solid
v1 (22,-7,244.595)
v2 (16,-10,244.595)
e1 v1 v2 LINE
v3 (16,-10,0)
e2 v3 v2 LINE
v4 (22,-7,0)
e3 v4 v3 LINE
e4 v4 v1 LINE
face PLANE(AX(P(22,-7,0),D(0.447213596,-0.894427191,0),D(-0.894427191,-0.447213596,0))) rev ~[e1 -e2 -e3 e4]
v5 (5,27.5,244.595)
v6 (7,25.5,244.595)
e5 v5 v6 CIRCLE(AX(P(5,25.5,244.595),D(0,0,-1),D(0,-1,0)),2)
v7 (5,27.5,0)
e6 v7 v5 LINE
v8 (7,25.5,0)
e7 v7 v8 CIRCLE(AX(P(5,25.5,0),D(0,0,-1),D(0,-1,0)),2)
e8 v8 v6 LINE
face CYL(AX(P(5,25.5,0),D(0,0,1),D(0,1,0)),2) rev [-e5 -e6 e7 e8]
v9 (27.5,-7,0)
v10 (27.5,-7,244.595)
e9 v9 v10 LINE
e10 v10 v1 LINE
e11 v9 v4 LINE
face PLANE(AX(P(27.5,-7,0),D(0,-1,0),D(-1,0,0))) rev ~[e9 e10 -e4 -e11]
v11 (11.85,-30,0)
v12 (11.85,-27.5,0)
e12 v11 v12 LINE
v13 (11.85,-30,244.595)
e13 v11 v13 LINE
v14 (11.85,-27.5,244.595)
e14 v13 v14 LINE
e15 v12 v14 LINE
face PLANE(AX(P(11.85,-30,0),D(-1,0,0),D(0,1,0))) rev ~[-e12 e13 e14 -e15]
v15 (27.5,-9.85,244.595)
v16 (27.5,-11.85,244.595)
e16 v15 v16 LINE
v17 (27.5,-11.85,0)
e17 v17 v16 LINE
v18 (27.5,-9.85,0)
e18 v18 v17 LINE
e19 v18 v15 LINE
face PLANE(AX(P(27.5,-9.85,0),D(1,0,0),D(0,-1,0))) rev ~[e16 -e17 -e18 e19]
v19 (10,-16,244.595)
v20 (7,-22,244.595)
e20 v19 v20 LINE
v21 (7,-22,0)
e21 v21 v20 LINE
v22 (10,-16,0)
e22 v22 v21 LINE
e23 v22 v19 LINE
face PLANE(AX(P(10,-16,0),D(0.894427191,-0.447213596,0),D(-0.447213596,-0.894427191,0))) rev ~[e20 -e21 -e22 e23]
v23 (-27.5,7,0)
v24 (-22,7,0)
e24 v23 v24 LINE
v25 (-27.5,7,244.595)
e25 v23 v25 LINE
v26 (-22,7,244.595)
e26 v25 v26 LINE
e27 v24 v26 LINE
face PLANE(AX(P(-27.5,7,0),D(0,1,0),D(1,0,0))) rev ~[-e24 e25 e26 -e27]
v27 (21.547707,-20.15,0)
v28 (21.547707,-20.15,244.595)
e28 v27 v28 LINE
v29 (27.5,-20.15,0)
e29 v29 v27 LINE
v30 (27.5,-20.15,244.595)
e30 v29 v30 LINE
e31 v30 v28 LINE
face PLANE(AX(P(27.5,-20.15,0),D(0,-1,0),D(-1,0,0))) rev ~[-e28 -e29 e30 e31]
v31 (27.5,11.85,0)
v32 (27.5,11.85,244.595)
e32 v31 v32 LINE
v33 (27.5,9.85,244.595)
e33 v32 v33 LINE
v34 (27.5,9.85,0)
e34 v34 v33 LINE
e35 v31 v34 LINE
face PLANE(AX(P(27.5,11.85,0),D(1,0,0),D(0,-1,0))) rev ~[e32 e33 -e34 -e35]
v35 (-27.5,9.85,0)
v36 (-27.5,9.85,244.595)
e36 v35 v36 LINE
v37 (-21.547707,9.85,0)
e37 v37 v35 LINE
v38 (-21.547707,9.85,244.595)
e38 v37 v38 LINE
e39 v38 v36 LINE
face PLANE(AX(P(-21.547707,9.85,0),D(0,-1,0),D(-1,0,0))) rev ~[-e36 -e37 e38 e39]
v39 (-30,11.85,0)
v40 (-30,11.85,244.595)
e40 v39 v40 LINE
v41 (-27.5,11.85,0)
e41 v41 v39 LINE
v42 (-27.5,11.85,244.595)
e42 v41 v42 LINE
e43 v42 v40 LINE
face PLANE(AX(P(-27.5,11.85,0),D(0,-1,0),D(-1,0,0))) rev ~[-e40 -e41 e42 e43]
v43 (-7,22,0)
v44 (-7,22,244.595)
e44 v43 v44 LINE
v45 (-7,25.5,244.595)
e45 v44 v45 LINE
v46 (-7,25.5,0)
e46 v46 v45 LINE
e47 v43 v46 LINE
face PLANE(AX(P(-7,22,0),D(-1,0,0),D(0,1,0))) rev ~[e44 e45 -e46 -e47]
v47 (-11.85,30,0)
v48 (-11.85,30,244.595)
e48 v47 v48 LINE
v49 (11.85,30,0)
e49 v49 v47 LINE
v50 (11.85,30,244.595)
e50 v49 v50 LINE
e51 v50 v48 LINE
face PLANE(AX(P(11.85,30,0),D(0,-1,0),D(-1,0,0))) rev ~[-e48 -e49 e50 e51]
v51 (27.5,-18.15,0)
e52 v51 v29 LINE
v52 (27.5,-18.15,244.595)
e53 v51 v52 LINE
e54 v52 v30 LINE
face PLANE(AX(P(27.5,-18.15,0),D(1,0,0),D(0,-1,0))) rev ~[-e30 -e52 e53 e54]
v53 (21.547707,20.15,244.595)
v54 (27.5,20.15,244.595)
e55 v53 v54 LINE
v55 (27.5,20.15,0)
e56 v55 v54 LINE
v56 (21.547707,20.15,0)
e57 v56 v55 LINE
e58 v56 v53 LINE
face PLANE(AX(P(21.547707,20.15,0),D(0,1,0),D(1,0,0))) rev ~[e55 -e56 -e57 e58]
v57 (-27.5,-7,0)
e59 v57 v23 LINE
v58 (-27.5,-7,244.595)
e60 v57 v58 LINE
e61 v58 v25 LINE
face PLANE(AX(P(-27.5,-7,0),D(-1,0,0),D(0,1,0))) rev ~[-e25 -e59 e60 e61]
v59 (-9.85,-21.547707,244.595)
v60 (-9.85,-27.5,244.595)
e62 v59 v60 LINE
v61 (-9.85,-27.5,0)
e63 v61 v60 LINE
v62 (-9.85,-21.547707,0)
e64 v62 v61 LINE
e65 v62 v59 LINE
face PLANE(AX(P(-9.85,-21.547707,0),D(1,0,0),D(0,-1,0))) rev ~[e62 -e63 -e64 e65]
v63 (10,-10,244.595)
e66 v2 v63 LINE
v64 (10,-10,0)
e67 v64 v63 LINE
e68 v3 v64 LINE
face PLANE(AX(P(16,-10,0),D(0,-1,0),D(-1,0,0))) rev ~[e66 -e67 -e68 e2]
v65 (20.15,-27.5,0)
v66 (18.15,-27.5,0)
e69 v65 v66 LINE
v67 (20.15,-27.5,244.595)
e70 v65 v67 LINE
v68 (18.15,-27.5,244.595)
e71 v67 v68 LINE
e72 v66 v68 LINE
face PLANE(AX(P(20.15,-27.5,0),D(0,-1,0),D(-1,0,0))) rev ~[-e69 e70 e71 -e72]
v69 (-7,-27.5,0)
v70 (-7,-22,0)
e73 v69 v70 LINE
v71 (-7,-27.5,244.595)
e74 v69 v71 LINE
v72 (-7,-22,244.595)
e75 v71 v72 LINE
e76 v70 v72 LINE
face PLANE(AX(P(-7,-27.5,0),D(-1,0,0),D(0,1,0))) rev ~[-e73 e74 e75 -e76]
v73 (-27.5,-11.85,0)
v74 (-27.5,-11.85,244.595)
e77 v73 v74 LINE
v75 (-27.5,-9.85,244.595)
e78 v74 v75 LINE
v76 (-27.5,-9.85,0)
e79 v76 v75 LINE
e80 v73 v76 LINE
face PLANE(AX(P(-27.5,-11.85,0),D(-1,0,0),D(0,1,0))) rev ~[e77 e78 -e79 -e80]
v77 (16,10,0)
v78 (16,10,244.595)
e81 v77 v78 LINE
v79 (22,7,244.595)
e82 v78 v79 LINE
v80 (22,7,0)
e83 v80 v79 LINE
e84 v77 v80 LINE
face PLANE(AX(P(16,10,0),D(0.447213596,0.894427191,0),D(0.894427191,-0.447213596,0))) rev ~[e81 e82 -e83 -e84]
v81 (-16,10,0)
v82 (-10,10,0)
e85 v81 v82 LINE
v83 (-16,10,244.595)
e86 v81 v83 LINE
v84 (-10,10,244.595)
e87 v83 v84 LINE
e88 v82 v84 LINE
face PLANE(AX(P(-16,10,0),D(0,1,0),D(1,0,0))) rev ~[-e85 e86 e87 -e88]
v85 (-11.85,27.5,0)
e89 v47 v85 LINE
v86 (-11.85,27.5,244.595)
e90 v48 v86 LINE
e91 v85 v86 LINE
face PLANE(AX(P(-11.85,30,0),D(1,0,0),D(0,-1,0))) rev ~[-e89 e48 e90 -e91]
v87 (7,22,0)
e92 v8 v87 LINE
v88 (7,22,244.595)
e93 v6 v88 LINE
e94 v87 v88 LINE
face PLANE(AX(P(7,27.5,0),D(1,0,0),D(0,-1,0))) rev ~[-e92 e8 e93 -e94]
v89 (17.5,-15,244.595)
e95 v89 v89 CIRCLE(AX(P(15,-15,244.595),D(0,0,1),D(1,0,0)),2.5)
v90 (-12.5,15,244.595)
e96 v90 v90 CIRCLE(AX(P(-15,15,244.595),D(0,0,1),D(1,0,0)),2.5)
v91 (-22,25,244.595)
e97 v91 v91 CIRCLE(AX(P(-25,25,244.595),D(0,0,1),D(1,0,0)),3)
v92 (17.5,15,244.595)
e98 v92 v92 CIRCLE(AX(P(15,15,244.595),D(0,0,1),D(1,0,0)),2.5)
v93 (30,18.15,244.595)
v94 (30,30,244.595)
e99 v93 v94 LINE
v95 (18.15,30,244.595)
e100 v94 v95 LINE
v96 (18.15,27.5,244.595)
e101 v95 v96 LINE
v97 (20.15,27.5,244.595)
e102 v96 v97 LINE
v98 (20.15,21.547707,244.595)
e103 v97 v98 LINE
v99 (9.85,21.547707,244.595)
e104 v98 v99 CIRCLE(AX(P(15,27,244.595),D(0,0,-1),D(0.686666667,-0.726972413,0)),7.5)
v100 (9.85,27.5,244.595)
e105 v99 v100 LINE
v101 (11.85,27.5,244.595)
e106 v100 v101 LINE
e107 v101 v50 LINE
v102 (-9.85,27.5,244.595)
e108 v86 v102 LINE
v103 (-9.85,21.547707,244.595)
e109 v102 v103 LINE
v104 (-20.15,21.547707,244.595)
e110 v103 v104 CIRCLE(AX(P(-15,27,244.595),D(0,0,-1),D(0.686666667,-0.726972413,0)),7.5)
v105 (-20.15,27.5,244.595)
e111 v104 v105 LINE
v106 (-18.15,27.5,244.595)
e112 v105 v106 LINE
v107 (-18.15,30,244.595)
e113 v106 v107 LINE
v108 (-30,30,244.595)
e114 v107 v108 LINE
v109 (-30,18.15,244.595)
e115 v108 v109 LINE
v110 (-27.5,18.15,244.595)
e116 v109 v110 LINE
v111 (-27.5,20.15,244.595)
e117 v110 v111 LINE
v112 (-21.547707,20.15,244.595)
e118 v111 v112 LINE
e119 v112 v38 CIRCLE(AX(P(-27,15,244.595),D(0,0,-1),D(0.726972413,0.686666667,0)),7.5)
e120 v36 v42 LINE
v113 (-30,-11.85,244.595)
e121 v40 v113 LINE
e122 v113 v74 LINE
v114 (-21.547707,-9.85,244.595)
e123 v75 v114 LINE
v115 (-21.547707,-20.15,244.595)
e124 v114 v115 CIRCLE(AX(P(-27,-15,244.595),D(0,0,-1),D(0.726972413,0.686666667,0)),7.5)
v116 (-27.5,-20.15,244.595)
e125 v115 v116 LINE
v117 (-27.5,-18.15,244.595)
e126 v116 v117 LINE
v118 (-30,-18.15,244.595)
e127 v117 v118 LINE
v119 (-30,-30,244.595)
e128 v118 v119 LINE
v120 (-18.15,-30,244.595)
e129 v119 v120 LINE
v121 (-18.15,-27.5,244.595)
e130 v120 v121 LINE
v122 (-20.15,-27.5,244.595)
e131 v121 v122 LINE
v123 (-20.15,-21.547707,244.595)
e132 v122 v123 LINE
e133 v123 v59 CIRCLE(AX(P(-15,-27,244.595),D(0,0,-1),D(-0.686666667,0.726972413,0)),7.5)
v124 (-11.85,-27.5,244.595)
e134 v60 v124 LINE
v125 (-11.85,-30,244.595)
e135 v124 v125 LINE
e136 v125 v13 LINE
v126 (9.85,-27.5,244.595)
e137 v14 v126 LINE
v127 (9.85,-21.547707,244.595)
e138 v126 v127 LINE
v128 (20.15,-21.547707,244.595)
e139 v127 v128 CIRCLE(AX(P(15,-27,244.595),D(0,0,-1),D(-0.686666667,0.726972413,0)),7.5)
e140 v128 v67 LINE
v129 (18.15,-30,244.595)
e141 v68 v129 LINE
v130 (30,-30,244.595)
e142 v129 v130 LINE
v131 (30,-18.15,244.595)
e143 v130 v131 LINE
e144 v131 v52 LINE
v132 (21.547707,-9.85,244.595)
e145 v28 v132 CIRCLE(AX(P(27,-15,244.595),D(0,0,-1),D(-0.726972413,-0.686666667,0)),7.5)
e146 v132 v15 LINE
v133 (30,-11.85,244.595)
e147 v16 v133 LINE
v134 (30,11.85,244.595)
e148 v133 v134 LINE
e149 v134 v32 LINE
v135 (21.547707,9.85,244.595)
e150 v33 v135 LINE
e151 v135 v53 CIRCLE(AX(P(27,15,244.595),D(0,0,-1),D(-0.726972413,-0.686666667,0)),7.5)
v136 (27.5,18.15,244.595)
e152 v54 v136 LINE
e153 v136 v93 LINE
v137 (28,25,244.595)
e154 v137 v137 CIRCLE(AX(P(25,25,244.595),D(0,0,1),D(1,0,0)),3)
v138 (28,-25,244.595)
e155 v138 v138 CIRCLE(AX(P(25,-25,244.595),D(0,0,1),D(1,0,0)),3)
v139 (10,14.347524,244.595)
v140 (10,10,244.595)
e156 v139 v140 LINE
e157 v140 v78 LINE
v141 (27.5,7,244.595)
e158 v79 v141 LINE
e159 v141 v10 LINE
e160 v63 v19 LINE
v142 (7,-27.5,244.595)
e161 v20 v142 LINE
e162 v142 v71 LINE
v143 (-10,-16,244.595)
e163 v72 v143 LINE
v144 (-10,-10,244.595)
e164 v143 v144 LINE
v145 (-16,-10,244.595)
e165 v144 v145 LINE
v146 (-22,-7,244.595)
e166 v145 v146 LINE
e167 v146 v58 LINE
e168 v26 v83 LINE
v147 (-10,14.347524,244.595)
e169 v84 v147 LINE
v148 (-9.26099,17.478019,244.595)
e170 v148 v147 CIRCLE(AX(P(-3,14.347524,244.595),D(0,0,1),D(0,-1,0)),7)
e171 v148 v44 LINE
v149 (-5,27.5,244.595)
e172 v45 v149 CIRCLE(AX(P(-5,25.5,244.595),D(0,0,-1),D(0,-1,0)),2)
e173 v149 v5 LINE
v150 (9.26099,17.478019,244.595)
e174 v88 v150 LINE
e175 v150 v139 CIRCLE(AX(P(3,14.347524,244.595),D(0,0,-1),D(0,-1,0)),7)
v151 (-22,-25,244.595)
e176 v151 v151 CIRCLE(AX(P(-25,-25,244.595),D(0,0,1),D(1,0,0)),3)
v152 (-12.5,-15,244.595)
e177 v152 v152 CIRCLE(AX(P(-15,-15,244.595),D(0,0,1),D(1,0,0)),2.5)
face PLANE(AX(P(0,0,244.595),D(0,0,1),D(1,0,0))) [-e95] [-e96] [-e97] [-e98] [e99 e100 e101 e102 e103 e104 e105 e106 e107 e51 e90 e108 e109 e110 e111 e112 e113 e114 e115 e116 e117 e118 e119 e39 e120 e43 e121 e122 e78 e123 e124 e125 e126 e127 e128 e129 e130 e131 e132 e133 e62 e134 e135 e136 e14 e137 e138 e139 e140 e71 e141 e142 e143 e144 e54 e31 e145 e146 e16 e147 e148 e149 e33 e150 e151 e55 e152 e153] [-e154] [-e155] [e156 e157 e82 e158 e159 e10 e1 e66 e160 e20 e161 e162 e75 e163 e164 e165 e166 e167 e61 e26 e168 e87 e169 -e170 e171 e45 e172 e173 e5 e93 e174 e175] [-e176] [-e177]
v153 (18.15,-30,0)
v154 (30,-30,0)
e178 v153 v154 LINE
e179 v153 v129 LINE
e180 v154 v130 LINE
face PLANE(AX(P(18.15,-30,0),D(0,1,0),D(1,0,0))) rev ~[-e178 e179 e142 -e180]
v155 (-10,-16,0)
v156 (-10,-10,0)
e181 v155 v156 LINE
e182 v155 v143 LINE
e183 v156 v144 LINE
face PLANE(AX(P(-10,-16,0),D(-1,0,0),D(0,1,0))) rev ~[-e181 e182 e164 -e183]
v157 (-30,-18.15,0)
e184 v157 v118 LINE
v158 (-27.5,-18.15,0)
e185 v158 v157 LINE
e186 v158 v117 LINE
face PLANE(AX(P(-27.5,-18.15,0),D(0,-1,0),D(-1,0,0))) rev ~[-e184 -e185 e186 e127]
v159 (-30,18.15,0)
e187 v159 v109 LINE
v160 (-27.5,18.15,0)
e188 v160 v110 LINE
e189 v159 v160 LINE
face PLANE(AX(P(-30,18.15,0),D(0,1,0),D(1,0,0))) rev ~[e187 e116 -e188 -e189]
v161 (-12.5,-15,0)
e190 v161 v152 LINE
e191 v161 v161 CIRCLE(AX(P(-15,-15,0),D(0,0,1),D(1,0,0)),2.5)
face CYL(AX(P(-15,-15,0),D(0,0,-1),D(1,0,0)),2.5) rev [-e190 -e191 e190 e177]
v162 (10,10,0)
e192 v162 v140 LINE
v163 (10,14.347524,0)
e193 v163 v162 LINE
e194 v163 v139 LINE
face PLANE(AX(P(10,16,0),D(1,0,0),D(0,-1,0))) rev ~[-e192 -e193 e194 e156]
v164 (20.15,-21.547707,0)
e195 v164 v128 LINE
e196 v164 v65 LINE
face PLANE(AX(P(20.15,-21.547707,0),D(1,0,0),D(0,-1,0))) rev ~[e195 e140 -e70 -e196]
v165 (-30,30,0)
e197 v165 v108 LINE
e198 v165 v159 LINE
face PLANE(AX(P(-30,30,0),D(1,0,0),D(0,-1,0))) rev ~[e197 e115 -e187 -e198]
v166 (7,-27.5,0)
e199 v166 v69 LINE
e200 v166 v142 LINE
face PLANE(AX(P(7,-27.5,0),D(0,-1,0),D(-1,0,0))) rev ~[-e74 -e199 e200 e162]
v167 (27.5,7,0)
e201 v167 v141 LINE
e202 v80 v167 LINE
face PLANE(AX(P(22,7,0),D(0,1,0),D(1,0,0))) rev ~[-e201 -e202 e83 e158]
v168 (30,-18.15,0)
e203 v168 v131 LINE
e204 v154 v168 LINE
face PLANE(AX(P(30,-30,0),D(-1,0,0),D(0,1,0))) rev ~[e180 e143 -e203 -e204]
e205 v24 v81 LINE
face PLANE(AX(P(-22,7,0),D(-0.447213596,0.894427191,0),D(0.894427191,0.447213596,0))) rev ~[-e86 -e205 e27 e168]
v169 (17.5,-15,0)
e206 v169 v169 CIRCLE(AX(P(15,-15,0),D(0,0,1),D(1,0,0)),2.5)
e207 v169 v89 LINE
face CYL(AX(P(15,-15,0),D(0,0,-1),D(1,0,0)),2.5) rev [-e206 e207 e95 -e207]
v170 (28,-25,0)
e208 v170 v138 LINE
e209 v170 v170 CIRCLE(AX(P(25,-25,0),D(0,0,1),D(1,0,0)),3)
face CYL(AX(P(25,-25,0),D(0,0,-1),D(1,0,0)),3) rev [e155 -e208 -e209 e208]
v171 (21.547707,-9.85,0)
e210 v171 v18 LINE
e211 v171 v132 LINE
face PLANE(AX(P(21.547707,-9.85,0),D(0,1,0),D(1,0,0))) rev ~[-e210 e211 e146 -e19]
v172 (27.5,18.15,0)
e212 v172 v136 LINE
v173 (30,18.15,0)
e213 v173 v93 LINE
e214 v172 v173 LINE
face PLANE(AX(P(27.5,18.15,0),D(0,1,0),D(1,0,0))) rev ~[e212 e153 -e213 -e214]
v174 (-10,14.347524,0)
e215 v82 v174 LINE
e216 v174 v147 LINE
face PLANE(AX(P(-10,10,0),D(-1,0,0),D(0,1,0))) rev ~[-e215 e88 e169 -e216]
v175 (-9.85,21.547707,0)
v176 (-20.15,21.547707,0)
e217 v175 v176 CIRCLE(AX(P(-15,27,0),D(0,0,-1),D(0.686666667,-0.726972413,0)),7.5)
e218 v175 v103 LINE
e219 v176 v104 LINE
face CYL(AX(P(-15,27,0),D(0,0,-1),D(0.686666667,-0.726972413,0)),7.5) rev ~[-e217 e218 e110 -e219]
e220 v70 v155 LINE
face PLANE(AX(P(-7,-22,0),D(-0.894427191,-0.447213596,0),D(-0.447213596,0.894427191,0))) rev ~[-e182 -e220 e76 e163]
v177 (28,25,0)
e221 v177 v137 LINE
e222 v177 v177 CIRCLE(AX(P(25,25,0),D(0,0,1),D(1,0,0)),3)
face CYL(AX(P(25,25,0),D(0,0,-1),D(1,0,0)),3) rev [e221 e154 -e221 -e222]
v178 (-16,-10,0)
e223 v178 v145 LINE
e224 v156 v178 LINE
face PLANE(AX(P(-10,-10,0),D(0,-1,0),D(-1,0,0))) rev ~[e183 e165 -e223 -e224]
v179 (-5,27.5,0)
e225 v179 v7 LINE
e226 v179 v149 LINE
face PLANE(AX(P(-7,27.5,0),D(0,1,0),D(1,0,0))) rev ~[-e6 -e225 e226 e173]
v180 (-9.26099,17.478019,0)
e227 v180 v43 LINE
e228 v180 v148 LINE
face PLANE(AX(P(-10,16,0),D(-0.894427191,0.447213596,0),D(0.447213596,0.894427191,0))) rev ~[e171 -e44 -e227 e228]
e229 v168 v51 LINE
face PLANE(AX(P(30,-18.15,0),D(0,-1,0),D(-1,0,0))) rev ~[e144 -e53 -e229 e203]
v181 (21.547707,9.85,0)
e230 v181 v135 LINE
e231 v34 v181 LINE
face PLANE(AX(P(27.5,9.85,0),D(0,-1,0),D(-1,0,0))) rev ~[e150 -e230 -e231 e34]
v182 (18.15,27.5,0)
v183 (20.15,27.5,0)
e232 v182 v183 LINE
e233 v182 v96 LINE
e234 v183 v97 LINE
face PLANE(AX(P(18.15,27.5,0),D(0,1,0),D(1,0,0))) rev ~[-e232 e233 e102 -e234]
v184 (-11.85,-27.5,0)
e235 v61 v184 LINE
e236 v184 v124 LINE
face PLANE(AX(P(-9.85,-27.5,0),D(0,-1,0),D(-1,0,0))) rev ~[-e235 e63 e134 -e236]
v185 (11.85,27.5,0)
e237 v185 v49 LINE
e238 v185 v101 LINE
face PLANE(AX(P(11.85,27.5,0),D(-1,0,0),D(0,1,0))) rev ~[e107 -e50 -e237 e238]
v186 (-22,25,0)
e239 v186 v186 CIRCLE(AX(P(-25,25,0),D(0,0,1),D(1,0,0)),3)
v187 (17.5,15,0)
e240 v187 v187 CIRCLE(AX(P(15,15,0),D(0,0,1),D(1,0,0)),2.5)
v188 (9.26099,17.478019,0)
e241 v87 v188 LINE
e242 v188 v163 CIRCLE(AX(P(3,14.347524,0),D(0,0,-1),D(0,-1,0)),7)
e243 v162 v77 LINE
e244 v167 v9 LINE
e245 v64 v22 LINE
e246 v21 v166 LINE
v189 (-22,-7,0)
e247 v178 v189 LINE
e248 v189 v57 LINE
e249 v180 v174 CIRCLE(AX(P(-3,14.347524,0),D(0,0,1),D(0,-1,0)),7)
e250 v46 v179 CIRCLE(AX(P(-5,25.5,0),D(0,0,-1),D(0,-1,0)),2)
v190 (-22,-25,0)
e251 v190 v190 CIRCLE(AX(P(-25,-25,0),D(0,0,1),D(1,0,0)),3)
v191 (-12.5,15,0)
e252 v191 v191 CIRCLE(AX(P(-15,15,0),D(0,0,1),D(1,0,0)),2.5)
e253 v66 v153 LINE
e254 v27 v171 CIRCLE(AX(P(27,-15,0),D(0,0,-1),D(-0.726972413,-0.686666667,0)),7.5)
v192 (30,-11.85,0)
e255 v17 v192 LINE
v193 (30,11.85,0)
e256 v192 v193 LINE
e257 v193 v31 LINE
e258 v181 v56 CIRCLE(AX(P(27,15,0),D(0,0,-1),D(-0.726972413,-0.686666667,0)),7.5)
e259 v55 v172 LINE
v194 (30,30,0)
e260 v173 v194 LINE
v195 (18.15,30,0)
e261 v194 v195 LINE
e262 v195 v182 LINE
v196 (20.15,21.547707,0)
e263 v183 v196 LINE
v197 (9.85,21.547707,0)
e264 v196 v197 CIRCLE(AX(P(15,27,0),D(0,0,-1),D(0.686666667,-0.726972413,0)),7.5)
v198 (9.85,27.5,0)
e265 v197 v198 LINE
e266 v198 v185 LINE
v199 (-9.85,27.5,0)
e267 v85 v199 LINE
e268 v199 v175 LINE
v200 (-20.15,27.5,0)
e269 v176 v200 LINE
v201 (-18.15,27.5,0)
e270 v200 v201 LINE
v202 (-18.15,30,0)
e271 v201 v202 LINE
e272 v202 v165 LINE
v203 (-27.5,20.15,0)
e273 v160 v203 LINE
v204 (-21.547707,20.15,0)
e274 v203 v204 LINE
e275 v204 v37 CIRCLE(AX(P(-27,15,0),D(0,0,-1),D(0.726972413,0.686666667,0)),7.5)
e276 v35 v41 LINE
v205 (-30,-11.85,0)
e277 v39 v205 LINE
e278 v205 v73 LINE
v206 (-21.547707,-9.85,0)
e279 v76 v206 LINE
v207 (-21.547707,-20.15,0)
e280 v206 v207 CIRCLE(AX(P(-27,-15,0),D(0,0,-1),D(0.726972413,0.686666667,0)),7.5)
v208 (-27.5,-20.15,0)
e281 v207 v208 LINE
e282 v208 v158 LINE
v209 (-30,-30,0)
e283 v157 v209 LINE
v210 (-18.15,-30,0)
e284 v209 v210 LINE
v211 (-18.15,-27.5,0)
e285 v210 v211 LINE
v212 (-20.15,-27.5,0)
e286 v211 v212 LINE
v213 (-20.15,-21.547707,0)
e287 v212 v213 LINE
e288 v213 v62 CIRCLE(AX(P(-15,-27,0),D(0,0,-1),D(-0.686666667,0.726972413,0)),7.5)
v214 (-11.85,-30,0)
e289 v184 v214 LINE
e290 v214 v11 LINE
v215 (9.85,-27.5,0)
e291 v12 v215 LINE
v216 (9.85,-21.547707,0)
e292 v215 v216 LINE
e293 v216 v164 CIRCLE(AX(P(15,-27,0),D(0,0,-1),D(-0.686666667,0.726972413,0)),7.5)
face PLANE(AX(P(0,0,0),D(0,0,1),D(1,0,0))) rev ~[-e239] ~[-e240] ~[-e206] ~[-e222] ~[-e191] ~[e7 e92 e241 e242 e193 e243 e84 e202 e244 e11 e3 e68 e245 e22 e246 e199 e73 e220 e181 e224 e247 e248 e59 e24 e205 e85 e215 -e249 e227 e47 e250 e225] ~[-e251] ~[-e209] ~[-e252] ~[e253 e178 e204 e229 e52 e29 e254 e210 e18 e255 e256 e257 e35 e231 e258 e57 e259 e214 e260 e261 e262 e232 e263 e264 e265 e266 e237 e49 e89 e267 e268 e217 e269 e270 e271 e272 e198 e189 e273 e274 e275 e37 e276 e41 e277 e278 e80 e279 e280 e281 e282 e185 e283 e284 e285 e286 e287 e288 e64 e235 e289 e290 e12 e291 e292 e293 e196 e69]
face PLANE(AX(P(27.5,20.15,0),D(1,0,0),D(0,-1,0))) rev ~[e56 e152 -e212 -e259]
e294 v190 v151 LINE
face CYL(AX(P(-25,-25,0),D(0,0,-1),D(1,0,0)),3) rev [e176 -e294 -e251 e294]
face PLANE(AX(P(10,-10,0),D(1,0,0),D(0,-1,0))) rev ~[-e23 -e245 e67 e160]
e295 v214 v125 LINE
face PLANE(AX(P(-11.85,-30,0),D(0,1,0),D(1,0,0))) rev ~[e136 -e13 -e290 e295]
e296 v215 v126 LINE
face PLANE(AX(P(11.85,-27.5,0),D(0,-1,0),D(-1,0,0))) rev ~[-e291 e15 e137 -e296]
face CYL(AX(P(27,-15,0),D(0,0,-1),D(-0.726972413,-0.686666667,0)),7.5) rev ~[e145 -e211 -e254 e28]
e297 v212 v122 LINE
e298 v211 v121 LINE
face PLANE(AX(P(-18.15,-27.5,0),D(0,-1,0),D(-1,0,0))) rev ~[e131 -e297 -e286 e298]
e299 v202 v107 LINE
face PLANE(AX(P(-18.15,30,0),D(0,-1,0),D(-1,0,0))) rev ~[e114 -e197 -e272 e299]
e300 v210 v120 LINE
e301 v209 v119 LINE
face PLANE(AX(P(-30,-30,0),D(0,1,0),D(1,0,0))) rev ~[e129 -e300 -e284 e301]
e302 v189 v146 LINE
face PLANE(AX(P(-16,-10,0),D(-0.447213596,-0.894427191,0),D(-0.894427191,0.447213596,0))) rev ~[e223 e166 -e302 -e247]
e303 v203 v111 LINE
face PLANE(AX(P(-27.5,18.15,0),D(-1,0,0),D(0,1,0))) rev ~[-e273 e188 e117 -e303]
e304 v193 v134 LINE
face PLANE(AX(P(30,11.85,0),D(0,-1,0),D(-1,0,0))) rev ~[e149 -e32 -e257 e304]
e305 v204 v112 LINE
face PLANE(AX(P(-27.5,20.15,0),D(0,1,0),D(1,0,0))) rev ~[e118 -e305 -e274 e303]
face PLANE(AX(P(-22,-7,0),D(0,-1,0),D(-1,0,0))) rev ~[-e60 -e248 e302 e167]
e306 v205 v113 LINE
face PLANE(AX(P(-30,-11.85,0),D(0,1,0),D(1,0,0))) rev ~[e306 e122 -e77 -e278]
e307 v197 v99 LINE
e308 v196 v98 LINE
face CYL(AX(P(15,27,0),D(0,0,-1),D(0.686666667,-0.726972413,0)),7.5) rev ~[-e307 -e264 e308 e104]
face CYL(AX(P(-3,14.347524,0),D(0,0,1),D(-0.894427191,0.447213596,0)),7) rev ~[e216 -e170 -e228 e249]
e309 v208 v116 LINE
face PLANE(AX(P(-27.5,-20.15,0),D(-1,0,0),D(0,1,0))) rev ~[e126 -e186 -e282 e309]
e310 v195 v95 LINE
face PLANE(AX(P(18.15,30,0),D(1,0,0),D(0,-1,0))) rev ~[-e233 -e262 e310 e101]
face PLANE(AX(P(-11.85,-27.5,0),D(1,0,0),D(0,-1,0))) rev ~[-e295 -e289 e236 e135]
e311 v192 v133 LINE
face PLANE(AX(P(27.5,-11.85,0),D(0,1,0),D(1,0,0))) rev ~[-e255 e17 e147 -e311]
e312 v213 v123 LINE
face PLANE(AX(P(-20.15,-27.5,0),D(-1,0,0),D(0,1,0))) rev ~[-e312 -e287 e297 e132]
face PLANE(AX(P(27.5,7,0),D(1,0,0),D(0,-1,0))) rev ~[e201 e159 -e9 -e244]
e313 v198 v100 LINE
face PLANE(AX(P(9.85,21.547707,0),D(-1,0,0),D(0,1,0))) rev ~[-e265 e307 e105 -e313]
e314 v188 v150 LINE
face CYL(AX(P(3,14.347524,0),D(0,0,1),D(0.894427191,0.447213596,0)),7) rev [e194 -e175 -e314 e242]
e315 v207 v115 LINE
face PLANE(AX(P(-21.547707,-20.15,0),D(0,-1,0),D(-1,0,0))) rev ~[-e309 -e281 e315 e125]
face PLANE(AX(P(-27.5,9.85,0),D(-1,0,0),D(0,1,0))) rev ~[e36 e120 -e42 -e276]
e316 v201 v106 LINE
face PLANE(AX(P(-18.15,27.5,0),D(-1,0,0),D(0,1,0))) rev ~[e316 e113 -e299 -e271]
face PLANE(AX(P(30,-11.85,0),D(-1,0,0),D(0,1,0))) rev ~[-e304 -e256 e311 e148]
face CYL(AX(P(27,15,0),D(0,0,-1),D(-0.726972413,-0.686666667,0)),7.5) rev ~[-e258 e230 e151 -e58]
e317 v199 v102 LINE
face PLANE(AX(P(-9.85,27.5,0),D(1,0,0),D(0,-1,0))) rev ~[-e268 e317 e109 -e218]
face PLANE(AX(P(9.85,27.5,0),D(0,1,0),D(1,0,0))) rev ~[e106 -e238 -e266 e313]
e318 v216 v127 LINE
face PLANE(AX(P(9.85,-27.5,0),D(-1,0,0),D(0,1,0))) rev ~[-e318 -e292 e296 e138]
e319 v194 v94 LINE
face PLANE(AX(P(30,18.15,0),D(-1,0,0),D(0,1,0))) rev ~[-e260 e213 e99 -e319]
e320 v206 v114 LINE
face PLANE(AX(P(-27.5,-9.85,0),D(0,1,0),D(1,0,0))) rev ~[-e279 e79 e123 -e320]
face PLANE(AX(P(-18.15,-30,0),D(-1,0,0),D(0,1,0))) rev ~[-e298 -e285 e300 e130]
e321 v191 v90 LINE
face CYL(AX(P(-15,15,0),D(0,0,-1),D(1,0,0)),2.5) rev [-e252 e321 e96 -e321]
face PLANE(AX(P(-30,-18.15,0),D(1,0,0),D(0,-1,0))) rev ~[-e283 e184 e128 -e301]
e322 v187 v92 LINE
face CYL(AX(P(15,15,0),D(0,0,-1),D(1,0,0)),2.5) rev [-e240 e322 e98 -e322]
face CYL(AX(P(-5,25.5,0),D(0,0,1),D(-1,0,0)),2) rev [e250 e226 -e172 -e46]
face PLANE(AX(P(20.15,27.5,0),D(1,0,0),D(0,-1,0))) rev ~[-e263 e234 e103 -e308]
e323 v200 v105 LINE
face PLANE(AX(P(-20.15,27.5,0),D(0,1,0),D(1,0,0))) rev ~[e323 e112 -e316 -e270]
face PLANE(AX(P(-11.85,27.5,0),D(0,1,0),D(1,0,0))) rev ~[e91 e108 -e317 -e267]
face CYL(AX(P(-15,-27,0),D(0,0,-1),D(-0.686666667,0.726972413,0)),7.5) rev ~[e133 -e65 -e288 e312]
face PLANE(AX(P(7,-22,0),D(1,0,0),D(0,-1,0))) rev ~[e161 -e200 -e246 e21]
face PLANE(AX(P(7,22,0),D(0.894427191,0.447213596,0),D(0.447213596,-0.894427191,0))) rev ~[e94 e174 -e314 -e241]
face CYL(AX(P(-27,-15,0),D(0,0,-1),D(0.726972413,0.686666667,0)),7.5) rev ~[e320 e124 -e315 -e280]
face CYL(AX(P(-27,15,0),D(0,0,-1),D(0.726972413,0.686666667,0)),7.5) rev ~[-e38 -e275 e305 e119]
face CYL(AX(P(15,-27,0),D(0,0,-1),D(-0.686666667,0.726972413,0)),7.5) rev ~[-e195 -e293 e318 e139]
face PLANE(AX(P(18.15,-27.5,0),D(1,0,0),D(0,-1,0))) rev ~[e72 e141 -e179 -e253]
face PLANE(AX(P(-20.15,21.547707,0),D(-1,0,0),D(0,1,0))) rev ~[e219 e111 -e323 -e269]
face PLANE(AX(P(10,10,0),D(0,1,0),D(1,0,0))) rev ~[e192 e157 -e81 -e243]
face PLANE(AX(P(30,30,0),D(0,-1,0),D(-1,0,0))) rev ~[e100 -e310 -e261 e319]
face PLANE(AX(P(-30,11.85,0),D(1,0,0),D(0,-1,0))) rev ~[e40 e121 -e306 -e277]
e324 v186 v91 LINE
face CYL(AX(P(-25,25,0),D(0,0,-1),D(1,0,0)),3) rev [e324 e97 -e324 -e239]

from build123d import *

# Parameters (mm, degrees)
F0_R     = 3
F0_R_2   = 2.5
F1_DEPTH = 244.595
F2_R     = 2
F3_R     = 7


# Not quite as in the source:
# - a feature names something its author has since deleted; it is built from what else it names


with BuildPart() as f1:
    # F0 (on Top) → F1 (new body)
    with BuildSketch(Plane.XY):
        with BuildLine():
            Line((18.15, -30), (30, -30))
            Line((30, -30), (30, -18.15))
            Line((30, -18.15), (27.5, -18.15))
            Line((27.5, -18.15), (27.5, -20.15))
            Line((27.5, -20.15), (21.5477069044, -20.15))
            ThreePointArc((21.5477069044, -20.15), (19.5, -15), (21.5477069044, -9.85))
            Line((21.5477069044, -9.85), (27.5, -9.85))
            Line((27.5, -9.85), (27.5, -11.85))
            Line((27.5, -11.85), (30, -11.85))
            Line((30, -11.85), (30, 11.85))
            Line((30, 11.85), (27.5, 11.85))
            Line((27.5, 11.85), (27.5, 9.85))
            Line((27.5, 9.85), (21.5477069044, 9.85))
            ThreePointArc((21.5477069044, 9.85), (19.5, 15), (21.5477069044, 20.15))
            Line((21.5477069044, 20.15), (27.5, 20.15))
            Line((27.5, 20.15), (27.5, 18.15))
            Line((27.5, 18.15), (30, 18.15))
            Line((30, 18.15), (30, 30))
            Line((30, 30), (18.15, 30))
            Line((18.15, 30), (18.15, 27.5))
            Line((18.15, 27.5), (20.15, 27.5))
            Line((20.15, 27.5), (20.15, 21.5477069044))
            ThreePointArc((20.15, 21.5477069044), (15, 19.5), (9.85, 21.5477069044))
            Line((9.85, 21.5477069044), (9.85, 27.5))
            Line((9.85, 27.5), (11.85, 27.5))
            Line((11.85, 27.5), (11.85, 30))
            Line((11.85, 30), (-11.85, 30))
            Line((-11.85, 30), (-11.85, 27.5))
            Line((-11.85, 27.5), (-9.85, 27.5))
            Line((-9.85, 27.5), (-9.85, 21.5477069044))
            ThreePointArc((-9.85, 21.5477069044), (-15, 19.5), (-20.15, 21.5477069044))
            Line((-20.15, 21.5477069044), (-20.15, 27.5))
            Line((-20.15, 27.5), (-18.15, 27.5))
            Line((-18.15, 27.5), (-18.15, 30))
            Line((-18.15, 30), (-30, 30))
            Line((-30, 30), (-30, 18.15))
            Line((-30, 18.15), (-27.5, 18.15))
            Line((-27.5, 18.15), (-27.5, 20.15))
            Line((-27.5, 20.15), (-21.5477069044, 20.15))
            ThreePointArc((-21.5477069044, 20.15), (-19.5, 15), (-21.5477069044, 9.85))
            Line((-21.5477069044, 9.85), (-27.5, 9.85))
            Line((-27.5, 9.85), (-27.5, 11.85))
            Line((-27.5, 11.85), (-30, 11.85))
            Line((-30, 11.85), (-30, -11.85))
            Line((-30, -11.85), (-27.5, -11.85))
            Line((-27.5, -11.85), (-27.5, -9.85))
            Line((-27.5, -9.85), (-21.5477069044, -9.85))
            ThreePointArc((-21.5477069044, -9.85), (-19.5, -15), (-21.5477069044, -20.15))
            Line((-21.5477069044, -20.15), (-27.5, -20.15))
            Line((-27.5, -20.15), (-27.5, -18.15))
            Line((-27.5, -18.15), (-30, -18.15))
            Line((-30, -18.15), (-30, -30))
            Line((-30, -30), (-18.15, -30))
            Line((-18.15, -30), (-18.15, -27.5))
            Line((-18.15, -27.5), (-20.15, -27.5))
            Line((-20.15, -27.5), (-20.15, -21.5477069044))
            ThreePointArc((-20.15, -21.5477069044), (-15, -19.5), (-9.85, -21.5477069044))
            Line((-9.85, -21.5477069044), (-9.85, -27.5))
            Line((-9.85, -27.5), (-11.85, -27.5))
            Line((-11.85, -27.5), (-11.85, -30))
            Line((-11.85, -30), (11.85, -30))
            Line((11.85, -30), (11.85, -27.5))
            Line((11.85, -27.5), (9.85, -27.5))
            Line((9.85, -27.5), (9.85, -21.5477069044))
            ThreePointArc((9.85, -21.5477069044), (15, -19.5), (20.15, -21.5477069044))
            Line((20.15, -21.5477069044), (20.15, -27.5))
            Line((20.15, -27.5), (18.15, -27.5))
            Line((18.15, -27.5), (18.15, -30))
        make_face()
        with Locations((-25, -25)):
            Circle(F0_R, mode=Mode.SUBTRACT)
        with Locations((-15, -15)):
            Circle(F0_R_2, mode=Mode.SUBTRACT)
        with Locations((25, -25)):
            Circle(F0_R, mode=Mode.SUBTRACT)
        with Locations((15, -15)):
            Circle(F0_R_2, mode=Mode.SUBTRACT)
        with Locations((-25, 25)):
            Circle(F0_R, mode=Mode.SUBTRACT)
        with Locations((-15, 15)):
            Circle(F0_R_2, mode=Mode.SUBTRACT)
        Polygon((-7, 22), (-7, 27.5), (0, 27.5), (7, 27.5), (7, 22), (10, 16), (10, 10), (16, 10), (22, 7), (27.5, 7), (27.5, 0), (27.5, -7), (22, -7), (16, -10), (10, -10), (10, -16), (7, -22), (7, -27.5), (0, -27.5), (-7, -27.5), (-7, -22), (-10, -16), (-10, -10), (-16, -10), (-22, -7), (-27.5, -7), (-27.5, 0), (-27.5, 7), (-22, 7), (-16, 10), (-10, 10), (-10, 16), align=None, mode=Mode.SUBTRACT)
        with Locations((15, 15)):
            Circle(F0_R_2, mode=Mode.SUBTRACT)
        with Locations((25, 25)):
            Circle(F0_R, mode=Mode.SUBTRACT)
    extrude(amount=F1_DEPTH)

    # F2
    f2_edges = [f1.edges().sort_by_distance(p)[0] for p in [
        (-7, 27.5, 122.2975),
        (7, 27.5, 122.2975),
    ]]
    fillet(f2_edges, radius=F2_R)

    # F3
    f3_edges = [f1.edges().sort_by_distance(p)[0] for p in [
        (-10, 16, 122.2975),
        (10, 16, 122.2975),
    ]]
    fillet(f3_edges, radius=F3_R)


solid = f1.part
